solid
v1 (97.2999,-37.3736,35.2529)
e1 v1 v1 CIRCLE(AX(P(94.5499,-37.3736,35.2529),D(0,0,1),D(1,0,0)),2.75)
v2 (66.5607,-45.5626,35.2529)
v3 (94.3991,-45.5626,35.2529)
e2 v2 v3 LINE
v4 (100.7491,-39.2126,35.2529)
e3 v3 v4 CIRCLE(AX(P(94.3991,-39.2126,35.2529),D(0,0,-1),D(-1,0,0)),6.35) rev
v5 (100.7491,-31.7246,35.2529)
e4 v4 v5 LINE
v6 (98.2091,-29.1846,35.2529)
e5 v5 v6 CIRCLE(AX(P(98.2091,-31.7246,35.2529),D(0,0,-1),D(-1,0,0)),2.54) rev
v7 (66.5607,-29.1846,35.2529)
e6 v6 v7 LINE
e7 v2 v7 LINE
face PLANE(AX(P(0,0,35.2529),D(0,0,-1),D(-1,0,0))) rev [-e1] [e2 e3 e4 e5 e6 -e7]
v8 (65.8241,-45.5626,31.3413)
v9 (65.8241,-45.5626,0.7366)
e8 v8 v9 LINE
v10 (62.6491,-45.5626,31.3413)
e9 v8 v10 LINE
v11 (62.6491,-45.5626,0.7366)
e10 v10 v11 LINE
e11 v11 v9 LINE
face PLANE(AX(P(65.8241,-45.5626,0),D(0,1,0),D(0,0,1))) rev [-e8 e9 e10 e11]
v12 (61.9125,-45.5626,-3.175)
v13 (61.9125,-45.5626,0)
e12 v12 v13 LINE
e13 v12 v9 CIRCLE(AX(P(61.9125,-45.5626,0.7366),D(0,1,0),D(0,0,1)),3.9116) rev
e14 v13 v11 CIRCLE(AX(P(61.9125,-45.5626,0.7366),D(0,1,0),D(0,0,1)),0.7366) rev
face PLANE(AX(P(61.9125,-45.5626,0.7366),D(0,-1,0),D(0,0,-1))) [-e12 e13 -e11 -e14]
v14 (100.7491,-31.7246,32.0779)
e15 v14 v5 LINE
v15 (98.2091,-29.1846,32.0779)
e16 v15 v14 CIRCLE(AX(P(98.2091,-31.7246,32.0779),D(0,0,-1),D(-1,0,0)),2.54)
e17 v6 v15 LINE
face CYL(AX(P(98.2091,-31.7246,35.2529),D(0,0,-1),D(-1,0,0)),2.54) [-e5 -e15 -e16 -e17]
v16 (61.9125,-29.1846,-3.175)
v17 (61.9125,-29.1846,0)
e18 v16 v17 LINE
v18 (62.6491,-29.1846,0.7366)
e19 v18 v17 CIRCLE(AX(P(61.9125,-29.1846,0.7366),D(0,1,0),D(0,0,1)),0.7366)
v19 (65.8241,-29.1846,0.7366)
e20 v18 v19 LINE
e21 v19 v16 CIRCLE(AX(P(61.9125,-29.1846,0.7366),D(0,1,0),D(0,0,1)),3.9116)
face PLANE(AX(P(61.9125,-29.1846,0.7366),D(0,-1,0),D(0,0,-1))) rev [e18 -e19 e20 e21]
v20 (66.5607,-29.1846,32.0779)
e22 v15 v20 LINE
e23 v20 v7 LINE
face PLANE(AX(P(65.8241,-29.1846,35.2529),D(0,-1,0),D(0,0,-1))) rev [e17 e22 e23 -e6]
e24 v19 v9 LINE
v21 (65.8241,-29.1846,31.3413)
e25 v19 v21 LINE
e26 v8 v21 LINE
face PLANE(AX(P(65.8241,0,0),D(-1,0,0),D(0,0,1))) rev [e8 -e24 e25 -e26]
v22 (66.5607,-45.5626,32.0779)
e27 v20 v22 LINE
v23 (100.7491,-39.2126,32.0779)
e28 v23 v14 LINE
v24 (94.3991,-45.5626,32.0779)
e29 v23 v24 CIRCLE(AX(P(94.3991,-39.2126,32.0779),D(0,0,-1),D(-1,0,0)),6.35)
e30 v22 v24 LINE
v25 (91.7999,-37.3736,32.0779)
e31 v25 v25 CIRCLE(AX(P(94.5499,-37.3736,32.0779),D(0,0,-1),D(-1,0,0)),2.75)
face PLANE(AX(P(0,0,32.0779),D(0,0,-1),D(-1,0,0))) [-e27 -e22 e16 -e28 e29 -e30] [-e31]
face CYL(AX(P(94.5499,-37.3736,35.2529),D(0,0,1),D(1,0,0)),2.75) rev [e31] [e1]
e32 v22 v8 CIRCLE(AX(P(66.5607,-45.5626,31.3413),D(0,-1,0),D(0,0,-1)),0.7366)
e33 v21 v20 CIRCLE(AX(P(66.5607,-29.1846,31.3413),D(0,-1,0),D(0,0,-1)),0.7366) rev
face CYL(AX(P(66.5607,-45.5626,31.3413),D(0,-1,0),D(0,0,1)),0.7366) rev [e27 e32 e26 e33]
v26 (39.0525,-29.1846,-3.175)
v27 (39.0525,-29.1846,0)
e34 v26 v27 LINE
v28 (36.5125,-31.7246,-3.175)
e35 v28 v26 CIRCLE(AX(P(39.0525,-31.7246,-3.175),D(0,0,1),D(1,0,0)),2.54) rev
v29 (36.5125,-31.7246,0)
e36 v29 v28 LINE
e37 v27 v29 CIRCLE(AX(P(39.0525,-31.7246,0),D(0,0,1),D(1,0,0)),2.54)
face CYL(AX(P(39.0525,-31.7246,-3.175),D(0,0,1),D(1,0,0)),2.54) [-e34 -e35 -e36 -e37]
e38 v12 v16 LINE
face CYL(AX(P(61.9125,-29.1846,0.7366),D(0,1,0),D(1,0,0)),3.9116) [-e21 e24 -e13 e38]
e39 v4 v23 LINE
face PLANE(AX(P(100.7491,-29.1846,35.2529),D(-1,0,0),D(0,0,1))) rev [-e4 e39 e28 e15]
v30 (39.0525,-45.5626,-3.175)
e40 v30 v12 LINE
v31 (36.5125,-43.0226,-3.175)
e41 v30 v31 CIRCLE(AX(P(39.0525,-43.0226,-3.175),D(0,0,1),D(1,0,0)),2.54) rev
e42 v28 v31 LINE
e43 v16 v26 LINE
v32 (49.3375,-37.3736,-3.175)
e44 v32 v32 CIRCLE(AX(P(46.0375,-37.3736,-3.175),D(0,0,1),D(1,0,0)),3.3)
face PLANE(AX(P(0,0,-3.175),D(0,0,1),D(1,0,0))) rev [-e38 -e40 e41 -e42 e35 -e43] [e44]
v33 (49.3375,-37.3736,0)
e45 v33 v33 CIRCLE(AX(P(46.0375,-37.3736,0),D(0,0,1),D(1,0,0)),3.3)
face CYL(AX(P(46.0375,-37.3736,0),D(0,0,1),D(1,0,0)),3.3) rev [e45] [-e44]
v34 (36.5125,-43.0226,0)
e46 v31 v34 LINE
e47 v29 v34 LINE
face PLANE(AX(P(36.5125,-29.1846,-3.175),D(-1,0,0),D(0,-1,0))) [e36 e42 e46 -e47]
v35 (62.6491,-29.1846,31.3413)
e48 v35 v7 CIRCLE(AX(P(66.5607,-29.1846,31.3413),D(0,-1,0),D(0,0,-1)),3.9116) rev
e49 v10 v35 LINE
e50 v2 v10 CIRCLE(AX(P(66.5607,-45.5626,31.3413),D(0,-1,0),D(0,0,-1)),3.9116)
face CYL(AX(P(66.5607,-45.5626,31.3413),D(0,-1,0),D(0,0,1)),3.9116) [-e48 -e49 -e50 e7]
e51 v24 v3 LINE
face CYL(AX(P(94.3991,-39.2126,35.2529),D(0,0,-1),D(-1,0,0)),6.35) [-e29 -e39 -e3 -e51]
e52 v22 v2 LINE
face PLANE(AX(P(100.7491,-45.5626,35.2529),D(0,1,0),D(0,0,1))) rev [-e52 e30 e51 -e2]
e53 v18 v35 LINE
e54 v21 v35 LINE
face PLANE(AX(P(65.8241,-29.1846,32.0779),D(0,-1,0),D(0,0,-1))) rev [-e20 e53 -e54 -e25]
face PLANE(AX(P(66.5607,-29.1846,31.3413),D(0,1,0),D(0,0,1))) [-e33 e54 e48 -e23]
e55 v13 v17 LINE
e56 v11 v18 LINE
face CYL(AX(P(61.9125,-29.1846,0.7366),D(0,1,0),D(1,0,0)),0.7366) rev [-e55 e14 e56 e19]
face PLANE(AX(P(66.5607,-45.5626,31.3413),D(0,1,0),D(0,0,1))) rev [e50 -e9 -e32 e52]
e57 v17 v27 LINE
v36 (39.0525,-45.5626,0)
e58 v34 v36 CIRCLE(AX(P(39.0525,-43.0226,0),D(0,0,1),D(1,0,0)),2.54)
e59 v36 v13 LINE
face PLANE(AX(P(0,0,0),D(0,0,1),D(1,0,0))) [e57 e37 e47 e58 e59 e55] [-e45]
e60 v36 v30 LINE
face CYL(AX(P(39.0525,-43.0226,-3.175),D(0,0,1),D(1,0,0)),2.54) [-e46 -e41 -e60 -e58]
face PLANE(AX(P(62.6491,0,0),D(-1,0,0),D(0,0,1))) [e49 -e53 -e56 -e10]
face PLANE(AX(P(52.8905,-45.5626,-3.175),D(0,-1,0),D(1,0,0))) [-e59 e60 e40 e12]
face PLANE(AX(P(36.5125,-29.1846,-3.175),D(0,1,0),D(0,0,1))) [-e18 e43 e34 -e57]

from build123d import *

# Parameters (mm, degrees)
BASE_FLANGE1_DEPTH           = 3.175
M6_CLEARANCE_HOLE1_D         = 6.6
EDGE_FLANGE1_DEPTH           = 16.378
EDGE_FLANGE2_STRIP_W         = 14.1732
EDGE_FLANGE2_STRIP_H         = 3.175
EDGE_FLANGE2_STRIP_CUT_DEPTH = 16.378
EDGE_FLANGE2_DEPTH           = 16.378
M5_CLEARANCE_HOLE1_D         = 5.5
FILLET1_R                    = 2.54
FILLET2_R                    = 6.35


# Sheet-metal steps are written as plain solids
with BuildPart() as part:
    # Sketch1 → Base-Flange1 (new body)
    with BuildSketch(Plane.XY):
        Polygon((52.8905, -45.562600001), (36.5125, -45.562600001), (36.5125, -29.184600001), (61.9125, -29.184600001), (61.9125, -45.562600001), align=None)
    extrude(amount=-BASE_FLANGE1_DEPTH)

    # M6 Clearance Hole1 (through all)
    with Locations(Plane.XY):
        with Locations((46.0375, -37.373600001)):
            Hole(M6_CLEARANCE_HOLE1_D / 2)

    # Edge-Flange1 section (across the edge) → Edge-Flange1 (add)
    with BuildSketch(Plane(origin=(62.6491, -45.562600001, 0), x_dir=(-1, 0, 0), z_dir=(0, 1, 0))):
        with BuildLine():
            Line((-3.175, 0.7366), (-3.175, 32.0779))
            Line((-3.175, 32.0779), (0, 32.0779))
            Line((0, 32.0779), (0, 0.7366))
            ThreePointArc((0, 0.7366), (0.215745145, 0.215745145), (0.7366, 0))
            Line((0.7366, 0), (0.7366, -3.175))
            ThreePointArc((0.7366, -3.175), (-2.029318885, -2.029318885), (-3.175, 0.7366))
        make_face()
    extrude(amount=EDGE_FLANGE1_DEPTH)

    # Edge-Flange2 strip (across the edge) → Edge-Flange2 strip cut (cut)
    with BuildSketch(Plane(origin=(65.8241, -29.184600001, 32.0779), x_dir=(0, 0, -1), z_dir=(0, -1, 0))):
        with Locations((-6.35, -1.5875)):
            Rectangle(EDGE_FLANGE2_STRIP_W, EDGE_FLANGE2_STRIP_H)
    extrude(amount=EDGE_FLANGE2_STRIP_CUT_DEPTH, mode=Mode.SUBTRACT)

    # Edge-Flange2 section (across the edge) → Edge-Flange2 (add)
    with BuildSketch(Plane(origin=(65.8241, -29.184600001, 32.0779), x_dir=(0, 0, -1), z_dir=(0, -1, 0))):
        with BuildLine():
            Line((-3.175, 0.7366), (-3.175, 34.925))
            Line((-3.175, 34.925), (0, 34.925))
            Line((0, 34.925), (0, 0.7366))
            ThreePointArc((0, 0.7366), (0.215745145, 0.215745145), (0.7366, 0))
            Line((0.7366, 0), (0.7366, -3.175))
            ThreePointArc((0.7366, -3.175), (-2.029318885, -2.029318885), (-3.175, 0.7366))
        make_face()
    extrude(amount=EDGE_FLANGE2_DEPTH)

    # M5 Clearance Hole1 (through all)
    with Locations(Plane.XY.offset(35.2529)):
        with Locations((94.5499, -37.373600001)):
            Hole(M5_CLEARANCE_HOLE1_D / 2)

    # Fillet1
    fillet1_edges = [part.edges().sort_by_distance(p)[0] for p in [
        (100.7491, -29.184600001, 33.6654),
        (36.5125, -45.562600001, -1.5875),
        (36.5125, -29.184600001, -1.5875),
    ]]
    fillet(fillet1_edges, radius=FILLET1_R)

    # Fillet2
    fillet2_edges = [part.edges().sort_by_distance(p)[0] for p in [
        (100.7491, -45.562600001, 33.6654),
    ]]
    fillet(fillet2_edges, radius=FILLET2_R)


solid = part.part
